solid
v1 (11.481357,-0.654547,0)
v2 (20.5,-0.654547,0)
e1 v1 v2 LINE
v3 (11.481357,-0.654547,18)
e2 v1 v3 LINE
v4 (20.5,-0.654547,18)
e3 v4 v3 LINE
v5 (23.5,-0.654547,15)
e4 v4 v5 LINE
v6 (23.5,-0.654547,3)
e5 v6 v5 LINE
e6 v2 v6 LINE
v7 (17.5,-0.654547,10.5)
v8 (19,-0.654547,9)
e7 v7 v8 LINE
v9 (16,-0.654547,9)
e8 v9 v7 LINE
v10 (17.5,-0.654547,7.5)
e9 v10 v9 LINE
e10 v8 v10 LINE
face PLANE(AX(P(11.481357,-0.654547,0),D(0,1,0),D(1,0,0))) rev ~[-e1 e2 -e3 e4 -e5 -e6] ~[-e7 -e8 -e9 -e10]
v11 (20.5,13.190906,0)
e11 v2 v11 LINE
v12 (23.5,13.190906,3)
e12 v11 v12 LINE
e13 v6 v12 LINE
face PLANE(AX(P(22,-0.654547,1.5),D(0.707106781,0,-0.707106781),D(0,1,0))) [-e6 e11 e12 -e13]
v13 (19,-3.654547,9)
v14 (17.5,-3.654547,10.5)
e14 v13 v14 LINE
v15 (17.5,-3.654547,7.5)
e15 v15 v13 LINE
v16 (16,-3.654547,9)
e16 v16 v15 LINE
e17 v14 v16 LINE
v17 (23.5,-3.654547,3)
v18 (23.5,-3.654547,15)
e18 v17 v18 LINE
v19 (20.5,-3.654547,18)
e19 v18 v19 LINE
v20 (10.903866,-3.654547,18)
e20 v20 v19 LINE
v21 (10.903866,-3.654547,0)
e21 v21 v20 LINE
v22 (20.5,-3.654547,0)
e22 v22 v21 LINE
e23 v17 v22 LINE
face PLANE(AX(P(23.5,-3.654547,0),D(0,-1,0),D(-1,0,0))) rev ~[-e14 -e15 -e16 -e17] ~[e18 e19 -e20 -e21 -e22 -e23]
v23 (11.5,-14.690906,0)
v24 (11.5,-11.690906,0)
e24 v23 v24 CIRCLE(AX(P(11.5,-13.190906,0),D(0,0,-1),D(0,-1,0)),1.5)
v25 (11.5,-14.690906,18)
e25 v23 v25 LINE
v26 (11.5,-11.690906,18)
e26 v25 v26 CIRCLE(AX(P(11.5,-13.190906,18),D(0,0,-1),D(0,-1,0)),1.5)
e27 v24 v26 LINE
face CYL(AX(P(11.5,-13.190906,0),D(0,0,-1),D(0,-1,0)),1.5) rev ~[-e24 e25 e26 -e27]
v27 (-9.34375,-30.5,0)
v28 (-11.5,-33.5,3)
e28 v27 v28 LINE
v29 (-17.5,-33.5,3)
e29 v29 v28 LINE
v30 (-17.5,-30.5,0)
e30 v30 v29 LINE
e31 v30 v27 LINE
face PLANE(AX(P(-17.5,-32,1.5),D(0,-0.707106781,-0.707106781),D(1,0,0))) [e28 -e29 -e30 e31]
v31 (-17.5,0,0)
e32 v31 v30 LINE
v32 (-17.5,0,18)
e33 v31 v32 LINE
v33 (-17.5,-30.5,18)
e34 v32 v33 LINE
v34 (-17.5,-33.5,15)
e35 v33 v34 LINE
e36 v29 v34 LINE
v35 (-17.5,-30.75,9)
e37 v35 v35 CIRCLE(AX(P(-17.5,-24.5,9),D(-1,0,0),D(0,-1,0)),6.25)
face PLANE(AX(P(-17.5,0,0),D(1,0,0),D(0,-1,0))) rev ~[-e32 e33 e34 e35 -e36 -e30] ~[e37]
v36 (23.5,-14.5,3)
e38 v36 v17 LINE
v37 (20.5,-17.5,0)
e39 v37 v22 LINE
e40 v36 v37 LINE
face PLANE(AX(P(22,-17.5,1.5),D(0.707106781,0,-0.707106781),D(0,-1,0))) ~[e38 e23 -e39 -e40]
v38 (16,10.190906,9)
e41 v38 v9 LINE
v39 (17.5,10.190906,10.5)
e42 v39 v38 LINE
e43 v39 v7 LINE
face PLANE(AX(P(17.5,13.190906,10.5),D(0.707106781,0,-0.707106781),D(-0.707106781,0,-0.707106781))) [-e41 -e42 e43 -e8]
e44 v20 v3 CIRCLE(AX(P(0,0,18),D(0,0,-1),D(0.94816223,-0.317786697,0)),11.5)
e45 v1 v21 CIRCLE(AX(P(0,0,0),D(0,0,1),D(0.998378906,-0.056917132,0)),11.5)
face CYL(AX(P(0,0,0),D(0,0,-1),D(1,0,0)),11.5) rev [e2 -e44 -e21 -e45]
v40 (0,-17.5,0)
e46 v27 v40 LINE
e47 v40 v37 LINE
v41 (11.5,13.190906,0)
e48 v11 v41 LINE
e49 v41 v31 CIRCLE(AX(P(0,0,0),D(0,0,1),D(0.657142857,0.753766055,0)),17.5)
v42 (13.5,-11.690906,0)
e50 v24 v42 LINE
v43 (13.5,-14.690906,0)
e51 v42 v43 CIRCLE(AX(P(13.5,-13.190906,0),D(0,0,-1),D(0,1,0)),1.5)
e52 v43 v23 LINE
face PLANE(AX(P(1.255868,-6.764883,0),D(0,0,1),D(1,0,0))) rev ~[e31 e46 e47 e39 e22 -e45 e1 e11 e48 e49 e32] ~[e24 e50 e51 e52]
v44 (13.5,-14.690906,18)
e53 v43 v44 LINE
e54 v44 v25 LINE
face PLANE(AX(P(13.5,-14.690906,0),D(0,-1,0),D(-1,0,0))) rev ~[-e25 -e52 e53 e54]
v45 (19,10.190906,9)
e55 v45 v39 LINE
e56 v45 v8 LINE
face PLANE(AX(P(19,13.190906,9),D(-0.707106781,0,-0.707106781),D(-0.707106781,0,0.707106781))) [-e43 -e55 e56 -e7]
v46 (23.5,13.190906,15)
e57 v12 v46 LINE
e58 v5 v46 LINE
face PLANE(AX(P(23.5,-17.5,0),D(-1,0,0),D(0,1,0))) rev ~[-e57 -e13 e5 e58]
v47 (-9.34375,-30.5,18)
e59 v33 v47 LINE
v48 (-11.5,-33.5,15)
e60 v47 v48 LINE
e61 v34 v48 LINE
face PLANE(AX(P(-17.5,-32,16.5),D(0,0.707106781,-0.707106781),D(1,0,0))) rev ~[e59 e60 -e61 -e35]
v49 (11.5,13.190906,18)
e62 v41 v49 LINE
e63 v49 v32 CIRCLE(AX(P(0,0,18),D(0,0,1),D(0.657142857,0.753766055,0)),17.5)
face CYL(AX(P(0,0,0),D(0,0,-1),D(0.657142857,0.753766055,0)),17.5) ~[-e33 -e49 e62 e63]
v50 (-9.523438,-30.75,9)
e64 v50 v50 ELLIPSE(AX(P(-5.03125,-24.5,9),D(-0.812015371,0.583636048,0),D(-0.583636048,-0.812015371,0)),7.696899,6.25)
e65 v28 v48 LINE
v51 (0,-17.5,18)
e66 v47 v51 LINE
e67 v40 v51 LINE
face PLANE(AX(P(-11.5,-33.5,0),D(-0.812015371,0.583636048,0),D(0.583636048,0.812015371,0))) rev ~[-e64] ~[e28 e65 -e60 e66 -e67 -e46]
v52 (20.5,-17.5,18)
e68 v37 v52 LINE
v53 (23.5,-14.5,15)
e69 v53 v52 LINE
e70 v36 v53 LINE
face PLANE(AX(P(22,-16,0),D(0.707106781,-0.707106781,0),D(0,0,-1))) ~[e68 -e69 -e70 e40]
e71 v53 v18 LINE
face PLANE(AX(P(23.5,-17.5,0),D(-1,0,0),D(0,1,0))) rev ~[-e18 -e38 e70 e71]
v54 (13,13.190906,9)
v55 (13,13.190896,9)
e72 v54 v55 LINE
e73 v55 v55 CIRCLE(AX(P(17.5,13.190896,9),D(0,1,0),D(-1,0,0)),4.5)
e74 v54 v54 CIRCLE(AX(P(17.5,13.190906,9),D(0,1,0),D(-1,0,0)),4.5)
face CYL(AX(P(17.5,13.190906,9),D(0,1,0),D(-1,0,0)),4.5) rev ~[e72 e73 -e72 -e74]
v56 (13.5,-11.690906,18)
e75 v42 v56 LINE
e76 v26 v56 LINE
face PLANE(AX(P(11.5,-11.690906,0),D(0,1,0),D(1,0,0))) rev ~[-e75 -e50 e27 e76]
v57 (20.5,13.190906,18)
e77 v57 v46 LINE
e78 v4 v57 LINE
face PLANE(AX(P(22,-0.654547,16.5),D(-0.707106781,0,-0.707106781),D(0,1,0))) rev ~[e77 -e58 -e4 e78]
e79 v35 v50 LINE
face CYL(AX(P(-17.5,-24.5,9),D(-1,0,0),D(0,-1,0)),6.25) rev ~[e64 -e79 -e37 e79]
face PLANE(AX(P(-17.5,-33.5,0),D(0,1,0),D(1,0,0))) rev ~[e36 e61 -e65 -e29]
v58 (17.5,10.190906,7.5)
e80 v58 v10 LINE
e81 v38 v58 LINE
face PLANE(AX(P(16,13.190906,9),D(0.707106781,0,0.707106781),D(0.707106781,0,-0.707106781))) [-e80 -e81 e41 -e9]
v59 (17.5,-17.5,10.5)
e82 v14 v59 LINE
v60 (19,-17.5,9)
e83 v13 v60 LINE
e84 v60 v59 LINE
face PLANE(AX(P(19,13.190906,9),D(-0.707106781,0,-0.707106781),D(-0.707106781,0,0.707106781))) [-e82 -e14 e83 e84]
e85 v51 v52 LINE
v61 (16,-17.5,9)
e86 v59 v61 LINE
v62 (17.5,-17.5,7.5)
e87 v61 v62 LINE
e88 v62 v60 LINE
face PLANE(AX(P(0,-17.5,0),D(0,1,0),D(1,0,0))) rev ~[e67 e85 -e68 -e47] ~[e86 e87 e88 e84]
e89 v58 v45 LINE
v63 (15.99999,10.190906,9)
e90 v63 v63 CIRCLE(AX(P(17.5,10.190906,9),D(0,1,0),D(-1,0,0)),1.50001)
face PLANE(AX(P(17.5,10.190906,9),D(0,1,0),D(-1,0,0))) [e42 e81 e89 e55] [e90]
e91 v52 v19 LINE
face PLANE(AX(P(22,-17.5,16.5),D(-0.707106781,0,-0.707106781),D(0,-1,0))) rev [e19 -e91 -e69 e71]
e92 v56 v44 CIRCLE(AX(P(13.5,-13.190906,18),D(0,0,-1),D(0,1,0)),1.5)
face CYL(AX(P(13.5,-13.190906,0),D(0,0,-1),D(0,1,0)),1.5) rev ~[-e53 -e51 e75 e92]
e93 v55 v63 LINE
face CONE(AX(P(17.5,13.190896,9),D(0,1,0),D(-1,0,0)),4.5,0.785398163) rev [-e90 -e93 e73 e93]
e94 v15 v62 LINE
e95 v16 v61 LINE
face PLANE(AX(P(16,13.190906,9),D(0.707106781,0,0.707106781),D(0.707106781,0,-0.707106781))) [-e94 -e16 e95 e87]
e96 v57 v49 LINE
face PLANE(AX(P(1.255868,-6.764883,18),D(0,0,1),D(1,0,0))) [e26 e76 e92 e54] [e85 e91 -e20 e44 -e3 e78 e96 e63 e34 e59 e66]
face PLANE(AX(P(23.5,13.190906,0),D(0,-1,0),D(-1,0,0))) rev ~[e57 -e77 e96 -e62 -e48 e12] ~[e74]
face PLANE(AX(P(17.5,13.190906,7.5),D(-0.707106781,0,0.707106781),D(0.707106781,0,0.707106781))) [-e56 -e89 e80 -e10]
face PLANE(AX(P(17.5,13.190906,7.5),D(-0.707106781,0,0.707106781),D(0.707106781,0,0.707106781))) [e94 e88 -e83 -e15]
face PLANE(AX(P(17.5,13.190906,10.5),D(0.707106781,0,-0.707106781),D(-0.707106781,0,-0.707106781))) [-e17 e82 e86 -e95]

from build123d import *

# Parameters (mm, degrees)
F0_R     = 11.5
F1_DEPTH = 18
F2_R     = 6.25
F3_DEPTH = 41.001
F4_R     = 4.5
F5_DEPTH = 3
F6_SIZE  = 2.99999
F7_DEPTH = 46.6919059583
F9_DEPTH = 18.001
F10_SIZE = 3
F11_SIZE = 3


# Not quite as in the source:
# - a fillet or chamfer is up to 0.001 mm smaller than in the source, because OpenCascade refuses the exact size


with BuildPart() as f1:
    # F0 (on Top) → F1 (new body)
    with BuildSketch(Plane.XY):
        with BuildLine():
            Line((-17.5, 0), (-17.5, -33.5))
            Line((-17.5, -33.5), (-11.5, -33.5))
            Line((-11.5, -33.5), (0, -17.5))
            Line((0, -17.5), (23.5, -17.5))
            Line((23.5, -17.5), (23.5, -13.1909059583))
            Line((23.5, -13.1909059583), (23.5, 13.1909059583))
            Line((23.5, 13.1909059583), (11.5, 13.1909059583))
            ThreePointArc((11.5, 13.1909059583), (-7.2456883731, 15.9295323221), (-17.5, 0))
        make_face()
        with BuildLine():
            Line((13.5, -14.6909059583), (11.5, -14.6909059583))
            ThreePointArc((11.5, -14.6909059583), (10, -13.1909059583), (11.5, -11.6909059583))
            Line((11.5, -11.6909059583), (13.5, -11.6909059583))
            ThreePointArc((13.5, -11.6909059583), (15, -13.1909059583), (13.5, -14.6909059583))
        make_face(mode=Mode.SUBTRACT)
        Circle(F0_R, mode=Mode.SUBTRACT)
    extrude(amount=F1_DEPTH)

    # F2 (on face) → F3 (cut, through all)
    with BuildSketch(Plane(origin=(-17.5, 0, 0), x_dir=(0, -1, 0), z_dir=(-1, 0, 0))):
        with Locations((24.5, 9)):
            Circle(F2_R)
    extrude(amount=-F3_DEPTH, mode=Mode.SUBTRACT)

    # F4 (on face) → F5 (cut)
    with BuildSketch(Plane(origin=(0, 13.1909059583, 0), x_dir=(-1, 0, 0), z_dir=(0, 1, 0))):
        with Locations((-17.5, 9)):
            Circle(F4_R)
        Polygon((-19, 9), (-17.5, 10.5), (-16, 9), (-17.5, 7.5), align=None, mode=Mode.SUBTRACT)
    extrude(amount=-F5_DEPTH, mode=Mode.SUBTRACT)

    # F6 (size 3 in the source; OpenCascade refuses exactly that, so slightly less here)
    f6_edges = [f1.edges().sort_by_distance(p)[0] for p in [
        (22, 10.190906, 9),
    ]]
    chamfer(f6_edges, length=F6_SIZE)

    # F7 (cut, through all): a face of the model
    f7_faces = [f1.faces().sort_by_distance(p)[0] for p in [
        (17.5, 13.1909059583, 9),
    ]]
    extrude(f7_faces, amount=-F7_DEPTH, mode=Mode.SUBTRACT)

    # F8 (on face) → F9 (cut, through all)
    with BuildSketch(Plane(origin=(0, 0, 0), x_dir=(1, 0, 0), z_dir=(0, 0, -1))):
        with BuildLine():
            Line((23.5, 0.6545470209), (23.5, 3.6545470209))
            Line((23.5, 3.6545470209), (10.9038656481, 3.6545470209))
            ThreePointArc((10.9038656481, 3.6545470209), (11.2926769611, 2.1738093411), (11.4813574196, 0.6545470209))
            Line((11.4813574196, 0.6545470209), (23.5, 0.6545470209))
        make_face()
    extrude(amount=-F9_DEPTH, mode=Mode.SUBTRACT)

    # F10
    f10_edges = [f1.edges().sort_by_distance(p)[0] for p in [
        (23.5, 6.268179, 0),
        (23.5, 6.268179, 18),
        (23.5, -10.577274, 0),
        (23.5, -10.577274, 18),
        (23.5, -17.5, 9),
    ]]
    chamfer(f10_edges, length=F10_SIZE)

    # F11
    f11_edges = [f1.edges().sort_by_distance(p)[0] for p in [
        (-14.5, -33.5, 18),
        (-14.5, -33.5, 0),
    ]]
    chamfer(f11_edges, length=F11_SIZE)


solid = f1.part
